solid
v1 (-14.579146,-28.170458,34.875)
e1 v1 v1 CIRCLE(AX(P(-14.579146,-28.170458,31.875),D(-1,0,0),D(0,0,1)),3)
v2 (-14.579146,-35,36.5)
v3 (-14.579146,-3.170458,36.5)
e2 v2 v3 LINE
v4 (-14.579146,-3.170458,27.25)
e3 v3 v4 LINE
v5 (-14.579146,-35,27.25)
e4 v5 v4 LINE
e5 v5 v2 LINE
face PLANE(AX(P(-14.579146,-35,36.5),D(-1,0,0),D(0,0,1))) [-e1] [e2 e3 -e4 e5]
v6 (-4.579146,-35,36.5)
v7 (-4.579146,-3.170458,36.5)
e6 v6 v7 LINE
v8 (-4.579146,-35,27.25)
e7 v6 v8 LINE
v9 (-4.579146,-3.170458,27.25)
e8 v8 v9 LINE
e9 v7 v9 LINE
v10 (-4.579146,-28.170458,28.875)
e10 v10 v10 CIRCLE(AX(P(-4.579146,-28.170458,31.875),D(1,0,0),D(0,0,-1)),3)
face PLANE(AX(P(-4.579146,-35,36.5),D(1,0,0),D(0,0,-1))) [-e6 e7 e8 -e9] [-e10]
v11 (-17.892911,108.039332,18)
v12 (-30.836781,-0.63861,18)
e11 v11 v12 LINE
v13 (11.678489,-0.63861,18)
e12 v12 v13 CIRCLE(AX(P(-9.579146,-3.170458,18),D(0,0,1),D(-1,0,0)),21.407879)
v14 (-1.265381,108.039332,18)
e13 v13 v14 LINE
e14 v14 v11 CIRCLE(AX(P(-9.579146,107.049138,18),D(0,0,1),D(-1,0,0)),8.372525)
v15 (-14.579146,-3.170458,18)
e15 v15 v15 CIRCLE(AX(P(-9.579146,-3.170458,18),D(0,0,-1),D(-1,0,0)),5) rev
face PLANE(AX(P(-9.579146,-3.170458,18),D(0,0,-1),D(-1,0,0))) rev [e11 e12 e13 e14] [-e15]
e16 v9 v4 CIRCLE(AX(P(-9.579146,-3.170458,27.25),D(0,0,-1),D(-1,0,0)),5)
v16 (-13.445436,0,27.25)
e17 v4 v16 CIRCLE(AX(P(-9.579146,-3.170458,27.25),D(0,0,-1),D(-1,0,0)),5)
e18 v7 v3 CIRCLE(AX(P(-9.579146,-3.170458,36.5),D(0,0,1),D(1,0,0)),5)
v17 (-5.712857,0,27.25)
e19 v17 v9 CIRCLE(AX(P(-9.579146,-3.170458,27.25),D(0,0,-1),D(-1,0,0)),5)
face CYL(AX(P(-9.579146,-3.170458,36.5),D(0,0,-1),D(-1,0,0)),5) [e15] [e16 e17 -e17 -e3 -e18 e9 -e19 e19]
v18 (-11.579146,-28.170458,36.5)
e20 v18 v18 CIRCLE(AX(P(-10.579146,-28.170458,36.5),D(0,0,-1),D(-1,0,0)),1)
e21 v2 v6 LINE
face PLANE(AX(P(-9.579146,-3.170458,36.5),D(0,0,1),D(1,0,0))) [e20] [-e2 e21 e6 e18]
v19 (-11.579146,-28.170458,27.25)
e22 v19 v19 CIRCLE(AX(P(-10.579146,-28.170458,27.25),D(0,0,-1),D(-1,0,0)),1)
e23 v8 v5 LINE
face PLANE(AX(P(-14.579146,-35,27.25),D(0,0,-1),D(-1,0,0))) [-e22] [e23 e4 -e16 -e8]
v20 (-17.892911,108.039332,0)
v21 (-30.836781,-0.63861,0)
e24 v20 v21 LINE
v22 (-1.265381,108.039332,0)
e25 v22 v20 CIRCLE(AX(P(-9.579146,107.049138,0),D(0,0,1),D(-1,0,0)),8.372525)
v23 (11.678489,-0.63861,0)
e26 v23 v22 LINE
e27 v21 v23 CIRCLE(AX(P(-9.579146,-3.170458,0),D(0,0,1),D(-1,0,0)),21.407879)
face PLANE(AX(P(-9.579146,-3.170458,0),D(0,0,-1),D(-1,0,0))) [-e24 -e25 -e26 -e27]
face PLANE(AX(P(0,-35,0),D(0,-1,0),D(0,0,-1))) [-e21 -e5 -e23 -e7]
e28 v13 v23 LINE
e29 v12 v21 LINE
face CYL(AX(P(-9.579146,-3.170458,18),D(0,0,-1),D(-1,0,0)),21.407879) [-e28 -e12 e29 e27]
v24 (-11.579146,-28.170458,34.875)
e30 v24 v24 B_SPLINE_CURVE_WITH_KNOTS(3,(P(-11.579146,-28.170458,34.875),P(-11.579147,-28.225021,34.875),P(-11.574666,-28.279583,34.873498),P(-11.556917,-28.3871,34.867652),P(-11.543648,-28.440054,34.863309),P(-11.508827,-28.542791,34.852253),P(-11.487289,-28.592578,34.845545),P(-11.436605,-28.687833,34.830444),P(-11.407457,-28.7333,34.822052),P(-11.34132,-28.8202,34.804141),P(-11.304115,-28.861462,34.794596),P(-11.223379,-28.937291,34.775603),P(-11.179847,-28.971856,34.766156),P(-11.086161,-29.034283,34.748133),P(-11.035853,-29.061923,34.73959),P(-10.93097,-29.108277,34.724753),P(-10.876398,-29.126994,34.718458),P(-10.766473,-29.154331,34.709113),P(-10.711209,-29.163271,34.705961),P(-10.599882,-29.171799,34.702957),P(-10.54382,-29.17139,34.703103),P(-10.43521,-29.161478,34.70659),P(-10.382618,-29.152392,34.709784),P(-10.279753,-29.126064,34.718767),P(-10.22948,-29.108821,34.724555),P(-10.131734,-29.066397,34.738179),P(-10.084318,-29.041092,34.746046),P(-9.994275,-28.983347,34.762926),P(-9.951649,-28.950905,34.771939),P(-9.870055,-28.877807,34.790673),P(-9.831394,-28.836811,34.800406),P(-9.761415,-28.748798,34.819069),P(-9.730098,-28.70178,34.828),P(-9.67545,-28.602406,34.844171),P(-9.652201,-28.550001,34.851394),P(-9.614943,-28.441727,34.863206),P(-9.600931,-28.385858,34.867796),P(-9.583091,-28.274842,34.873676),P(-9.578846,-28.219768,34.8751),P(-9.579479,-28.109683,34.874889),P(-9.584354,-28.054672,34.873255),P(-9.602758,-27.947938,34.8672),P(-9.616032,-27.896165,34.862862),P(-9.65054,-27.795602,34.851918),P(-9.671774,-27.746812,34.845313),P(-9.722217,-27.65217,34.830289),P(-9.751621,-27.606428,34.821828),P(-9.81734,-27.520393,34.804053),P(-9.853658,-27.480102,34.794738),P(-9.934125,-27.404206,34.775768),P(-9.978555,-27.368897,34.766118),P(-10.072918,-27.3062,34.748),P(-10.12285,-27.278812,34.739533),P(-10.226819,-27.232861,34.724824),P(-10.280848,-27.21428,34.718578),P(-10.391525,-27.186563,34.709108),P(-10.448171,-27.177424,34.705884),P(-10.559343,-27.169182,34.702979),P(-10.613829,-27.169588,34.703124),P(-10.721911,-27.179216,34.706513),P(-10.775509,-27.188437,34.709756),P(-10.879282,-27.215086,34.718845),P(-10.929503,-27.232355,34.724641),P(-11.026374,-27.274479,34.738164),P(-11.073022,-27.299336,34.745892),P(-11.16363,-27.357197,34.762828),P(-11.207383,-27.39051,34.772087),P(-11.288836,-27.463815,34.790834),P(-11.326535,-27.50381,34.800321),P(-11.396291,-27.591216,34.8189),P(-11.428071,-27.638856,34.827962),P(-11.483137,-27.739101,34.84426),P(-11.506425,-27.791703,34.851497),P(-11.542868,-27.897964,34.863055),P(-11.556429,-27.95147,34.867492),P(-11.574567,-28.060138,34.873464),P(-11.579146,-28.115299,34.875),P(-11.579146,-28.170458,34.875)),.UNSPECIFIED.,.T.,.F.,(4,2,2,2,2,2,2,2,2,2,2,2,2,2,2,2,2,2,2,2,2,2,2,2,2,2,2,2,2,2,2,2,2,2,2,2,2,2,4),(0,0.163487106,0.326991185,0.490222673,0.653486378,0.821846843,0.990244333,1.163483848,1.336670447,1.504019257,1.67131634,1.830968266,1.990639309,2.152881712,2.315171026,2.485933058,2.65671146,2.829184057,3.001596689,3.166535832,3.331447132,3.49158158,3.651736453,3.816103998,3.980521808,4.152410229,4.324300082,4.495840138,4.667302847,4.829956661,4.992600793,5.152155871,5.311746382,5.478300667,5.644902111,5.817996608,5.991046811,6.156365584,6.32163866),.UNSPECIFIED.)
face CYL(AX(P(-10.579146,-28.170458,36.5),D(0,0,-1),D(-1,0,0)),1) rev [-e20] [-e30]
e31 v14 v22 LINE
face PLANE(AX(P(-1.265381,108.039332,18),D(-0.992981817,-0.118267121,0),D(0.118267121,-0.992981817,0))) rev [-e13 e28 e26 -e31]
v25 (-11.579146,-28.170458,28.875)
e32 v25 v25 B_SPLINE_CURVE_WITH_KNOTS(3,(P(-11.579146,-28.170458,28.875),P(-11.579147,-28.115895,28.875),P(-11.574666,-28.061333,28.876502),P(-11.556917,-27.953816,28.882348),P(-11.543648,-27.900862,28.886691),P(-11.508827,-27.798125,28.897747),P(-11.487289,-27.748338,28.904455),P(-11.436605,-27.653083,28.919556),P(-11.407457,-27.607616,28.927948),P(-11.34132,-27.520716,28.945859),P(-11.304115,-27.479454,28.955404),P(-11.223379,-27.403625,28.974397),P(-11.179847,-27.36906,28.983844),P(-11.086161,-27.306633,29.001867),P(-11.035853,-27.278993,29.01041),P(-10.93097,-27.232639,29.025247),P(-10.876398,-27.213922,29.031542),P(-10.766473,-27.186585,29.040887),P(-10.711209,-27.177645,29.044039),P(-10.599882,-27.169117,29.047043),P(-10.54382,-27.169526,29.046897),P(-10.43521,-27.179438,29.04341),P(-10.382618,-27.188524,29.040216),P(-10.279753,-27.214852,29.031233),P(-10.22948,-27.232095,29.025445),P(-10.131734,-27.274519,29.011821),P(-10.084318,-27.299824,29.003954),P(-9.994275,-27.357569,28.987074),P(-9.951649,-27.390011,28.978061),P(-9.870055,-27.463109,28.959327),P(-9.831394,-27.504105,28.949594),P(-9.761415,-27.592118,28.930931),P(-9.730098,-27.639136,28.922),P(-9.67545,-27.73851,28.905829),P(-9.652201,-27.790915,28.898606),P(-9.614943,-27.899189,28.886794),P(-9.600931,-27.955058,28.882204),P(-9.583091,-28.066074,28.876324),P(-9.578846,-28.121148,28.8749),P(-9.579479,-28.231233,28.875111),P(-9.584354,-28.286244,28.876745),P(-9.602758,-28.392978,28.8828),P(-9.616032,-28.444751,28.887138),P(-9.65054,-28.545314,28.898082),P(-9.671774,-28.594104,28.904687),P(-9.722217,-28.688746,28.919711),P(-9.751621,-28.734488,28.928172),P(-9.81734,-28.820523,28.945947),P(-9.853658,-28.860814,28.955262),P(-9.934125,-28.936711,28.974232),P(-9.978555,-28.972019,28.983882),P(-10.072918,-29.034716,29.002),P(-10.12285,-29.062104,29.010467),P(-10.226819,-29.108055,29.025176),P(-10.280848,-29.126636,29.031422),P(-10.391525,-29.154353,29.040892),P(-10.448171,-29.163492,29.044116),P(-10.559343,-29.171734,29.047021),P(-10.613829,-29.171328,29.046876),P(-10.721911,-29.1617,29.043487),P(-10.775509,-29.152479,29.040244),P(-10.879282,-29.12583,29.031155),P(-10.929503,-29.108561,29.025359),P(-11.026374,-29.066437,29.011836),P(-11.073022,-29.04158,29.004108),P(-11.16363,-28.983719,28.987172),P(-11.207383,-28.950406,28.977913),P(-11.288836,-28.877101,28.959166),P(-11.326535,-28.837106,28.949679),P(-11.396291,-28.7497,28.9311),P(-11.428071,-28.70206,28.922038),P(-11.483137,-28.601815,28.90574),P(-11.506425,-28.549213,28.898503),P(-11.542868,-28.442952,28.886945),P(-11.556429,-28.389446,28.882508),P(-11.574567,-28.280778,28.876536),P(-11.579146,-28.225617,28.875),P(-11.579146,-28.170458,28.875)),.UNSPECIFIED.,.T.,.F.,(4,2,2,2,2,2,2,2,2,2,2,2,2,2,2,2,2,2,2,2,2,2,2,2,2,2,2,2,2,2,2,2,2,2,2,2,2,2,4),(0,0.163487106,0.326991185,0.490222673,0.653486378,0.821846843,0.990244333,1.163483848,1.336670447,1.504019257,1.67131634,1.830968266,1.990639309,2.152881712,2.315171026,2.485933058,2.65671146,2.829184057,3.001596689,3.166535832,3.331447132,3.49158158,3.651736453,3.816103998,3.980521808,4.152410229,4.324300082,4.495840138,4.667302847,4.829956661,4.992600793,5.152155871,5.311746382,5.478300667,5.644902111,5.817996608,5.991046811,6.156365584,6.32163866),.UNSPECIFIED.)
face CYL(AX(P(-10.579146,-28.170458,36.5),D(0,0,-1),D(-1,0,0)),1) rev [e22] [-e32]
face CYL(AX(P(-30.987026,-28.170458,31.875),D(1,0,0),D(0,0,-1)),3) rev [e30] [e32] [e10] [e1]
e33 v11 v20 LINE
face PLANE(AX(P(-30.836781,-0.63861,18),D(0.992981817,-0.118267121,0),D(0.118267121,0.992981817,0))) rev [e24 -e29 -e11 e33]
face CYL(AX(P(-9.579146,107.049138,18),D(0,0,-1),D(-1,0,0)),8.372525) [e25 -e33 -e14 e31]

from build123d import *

# Parameters (mm, degrees)
BOSS_EXTRUDE1_DEPTH = 18
SKETCH2_R           = 5
BOSS_EXTRUDE2_DEPTH = 18.5
SKETCH3_W           = 10
SKETCH3_H           = 9.25
BOSS_EXTRUDE3_DEPTH = 35
DELETEFACE1_START   = 27.25
DELETEFACE1_DEPTH   = 9.25
SKETCH4_R           = 3
CUT_EXTRUDE1_DEPTH  = 124.902325662
SKETCH5_R           = 1
CUT_EXTRUDE4_DEPTH  = 123.576174145


# Read off the part's stored shape, not the designer's step: DeleteFace1
with BuildPart() as part:
    # Sketch1 → Boss-Extrude1 (new body)
    with BuildSketch(Plane(origin=(0, 0, 0), x_dir=(0, 1, 0), z_dir=(0, 0, 1))):
        with BuildLine():
            Line((-0.63860975, 30.836781145), (108.03933208, 17.892911363))
            ThreePointArc((108.03933208, 17.892911363), (115.421662674, 9.579146253), (108.03933208, 1.265381143))
            Line((108.03933208, 1.265381143), (-0.63860975, -11.678488639))
            ThreePointArc((-0.63860975, -11.678488639), (-24.578337326, 9.579146253), (-0.63860975, 30.836781145))
        make_face()
    extrude(amount=BOSS_EXTRUDE1_DEPTH)

    # Sketch2 → Boss-Extrude2 (add)
    with BuildSketch(Plane.XY.offset(18)):
        with Locations(Location((-9.579146253, -3.17045801, 0), (0, 0, 180))):
            Circle(SKETCH2_R)
    extrude(amount=BOSS_EXTRUDE2_DEPTH)

    # Sketch3 → Boss-Extrude3 (add)
    with BuildSketch(Plane(origin=(0, 0, 0), x_dir=(-1, 0, 0), z_dir=(0, 1, 0))):
        with Locations((9.579146253, 31.875)):
            Rectangle(SKETCH3_W, SKETCH3_H)
    extrude(amount=-BOSS_EXTRUDE3_DEPTH)

    # DeleteFace1 outline → DeleteFace1 (cut)
    with BuildSketch(Plane.XY.offset(DELETEFACE1_START)):
        with BuildLine():
            ThreePointArc((-5.712856558, 0), (-4.871097375, -1.486927267), (-4.579146253, -3.17045801))
            Line((-4.579146253, -3.17045801), (-4.579146253, 0))
            Line((-4.579146253, 0), (-5.712856558, 0))
        make_face()
        with BuildLine():
            Line((-14.579146253, 0), (-14.579146253, -3.17045801))
            ThreePointArc((-14.579146253, -3.17045801), (-14.287195131, -1.486927267), (-13.445435948, 0))
            Line((-13.445435948, 0), (-14.579146253, 0))
        make_face()
    extrude(amount=DELETEFACE1_DEPTH, mode=Mode.SUBTRACT)

    # Sketch4 → Cut-Extrude1 (cut, through all)
    with BuildSketch(Plane.YZ.offset(-4.579146253)):
        with Locations(Location((-28.17045801, 31.875, 0), (0, 0, 270))):
            Circle(SKETCH4_R)
    extrude(amount=-CUT_EXTRUDE1_DEPTH, mode=Mode.SUBTRACT)

    # Sketch5 → Cut-Extrude4 (cut, through all)
    with BuildSketch(Plane(origin=(0, 0, 27.25), x_dir=(1, 0, 0), z_dir=(0, 0, -1))):
        with Locations(Location((-10.579146253, 28.17045801, 0), (0, 0, 180))):
            Circle(SKETCH5_R)
    extrude(amount=-CUT_EXTRUDE4_DEPTH, mode=Mode.SUBTRACT)


solid = part.part
